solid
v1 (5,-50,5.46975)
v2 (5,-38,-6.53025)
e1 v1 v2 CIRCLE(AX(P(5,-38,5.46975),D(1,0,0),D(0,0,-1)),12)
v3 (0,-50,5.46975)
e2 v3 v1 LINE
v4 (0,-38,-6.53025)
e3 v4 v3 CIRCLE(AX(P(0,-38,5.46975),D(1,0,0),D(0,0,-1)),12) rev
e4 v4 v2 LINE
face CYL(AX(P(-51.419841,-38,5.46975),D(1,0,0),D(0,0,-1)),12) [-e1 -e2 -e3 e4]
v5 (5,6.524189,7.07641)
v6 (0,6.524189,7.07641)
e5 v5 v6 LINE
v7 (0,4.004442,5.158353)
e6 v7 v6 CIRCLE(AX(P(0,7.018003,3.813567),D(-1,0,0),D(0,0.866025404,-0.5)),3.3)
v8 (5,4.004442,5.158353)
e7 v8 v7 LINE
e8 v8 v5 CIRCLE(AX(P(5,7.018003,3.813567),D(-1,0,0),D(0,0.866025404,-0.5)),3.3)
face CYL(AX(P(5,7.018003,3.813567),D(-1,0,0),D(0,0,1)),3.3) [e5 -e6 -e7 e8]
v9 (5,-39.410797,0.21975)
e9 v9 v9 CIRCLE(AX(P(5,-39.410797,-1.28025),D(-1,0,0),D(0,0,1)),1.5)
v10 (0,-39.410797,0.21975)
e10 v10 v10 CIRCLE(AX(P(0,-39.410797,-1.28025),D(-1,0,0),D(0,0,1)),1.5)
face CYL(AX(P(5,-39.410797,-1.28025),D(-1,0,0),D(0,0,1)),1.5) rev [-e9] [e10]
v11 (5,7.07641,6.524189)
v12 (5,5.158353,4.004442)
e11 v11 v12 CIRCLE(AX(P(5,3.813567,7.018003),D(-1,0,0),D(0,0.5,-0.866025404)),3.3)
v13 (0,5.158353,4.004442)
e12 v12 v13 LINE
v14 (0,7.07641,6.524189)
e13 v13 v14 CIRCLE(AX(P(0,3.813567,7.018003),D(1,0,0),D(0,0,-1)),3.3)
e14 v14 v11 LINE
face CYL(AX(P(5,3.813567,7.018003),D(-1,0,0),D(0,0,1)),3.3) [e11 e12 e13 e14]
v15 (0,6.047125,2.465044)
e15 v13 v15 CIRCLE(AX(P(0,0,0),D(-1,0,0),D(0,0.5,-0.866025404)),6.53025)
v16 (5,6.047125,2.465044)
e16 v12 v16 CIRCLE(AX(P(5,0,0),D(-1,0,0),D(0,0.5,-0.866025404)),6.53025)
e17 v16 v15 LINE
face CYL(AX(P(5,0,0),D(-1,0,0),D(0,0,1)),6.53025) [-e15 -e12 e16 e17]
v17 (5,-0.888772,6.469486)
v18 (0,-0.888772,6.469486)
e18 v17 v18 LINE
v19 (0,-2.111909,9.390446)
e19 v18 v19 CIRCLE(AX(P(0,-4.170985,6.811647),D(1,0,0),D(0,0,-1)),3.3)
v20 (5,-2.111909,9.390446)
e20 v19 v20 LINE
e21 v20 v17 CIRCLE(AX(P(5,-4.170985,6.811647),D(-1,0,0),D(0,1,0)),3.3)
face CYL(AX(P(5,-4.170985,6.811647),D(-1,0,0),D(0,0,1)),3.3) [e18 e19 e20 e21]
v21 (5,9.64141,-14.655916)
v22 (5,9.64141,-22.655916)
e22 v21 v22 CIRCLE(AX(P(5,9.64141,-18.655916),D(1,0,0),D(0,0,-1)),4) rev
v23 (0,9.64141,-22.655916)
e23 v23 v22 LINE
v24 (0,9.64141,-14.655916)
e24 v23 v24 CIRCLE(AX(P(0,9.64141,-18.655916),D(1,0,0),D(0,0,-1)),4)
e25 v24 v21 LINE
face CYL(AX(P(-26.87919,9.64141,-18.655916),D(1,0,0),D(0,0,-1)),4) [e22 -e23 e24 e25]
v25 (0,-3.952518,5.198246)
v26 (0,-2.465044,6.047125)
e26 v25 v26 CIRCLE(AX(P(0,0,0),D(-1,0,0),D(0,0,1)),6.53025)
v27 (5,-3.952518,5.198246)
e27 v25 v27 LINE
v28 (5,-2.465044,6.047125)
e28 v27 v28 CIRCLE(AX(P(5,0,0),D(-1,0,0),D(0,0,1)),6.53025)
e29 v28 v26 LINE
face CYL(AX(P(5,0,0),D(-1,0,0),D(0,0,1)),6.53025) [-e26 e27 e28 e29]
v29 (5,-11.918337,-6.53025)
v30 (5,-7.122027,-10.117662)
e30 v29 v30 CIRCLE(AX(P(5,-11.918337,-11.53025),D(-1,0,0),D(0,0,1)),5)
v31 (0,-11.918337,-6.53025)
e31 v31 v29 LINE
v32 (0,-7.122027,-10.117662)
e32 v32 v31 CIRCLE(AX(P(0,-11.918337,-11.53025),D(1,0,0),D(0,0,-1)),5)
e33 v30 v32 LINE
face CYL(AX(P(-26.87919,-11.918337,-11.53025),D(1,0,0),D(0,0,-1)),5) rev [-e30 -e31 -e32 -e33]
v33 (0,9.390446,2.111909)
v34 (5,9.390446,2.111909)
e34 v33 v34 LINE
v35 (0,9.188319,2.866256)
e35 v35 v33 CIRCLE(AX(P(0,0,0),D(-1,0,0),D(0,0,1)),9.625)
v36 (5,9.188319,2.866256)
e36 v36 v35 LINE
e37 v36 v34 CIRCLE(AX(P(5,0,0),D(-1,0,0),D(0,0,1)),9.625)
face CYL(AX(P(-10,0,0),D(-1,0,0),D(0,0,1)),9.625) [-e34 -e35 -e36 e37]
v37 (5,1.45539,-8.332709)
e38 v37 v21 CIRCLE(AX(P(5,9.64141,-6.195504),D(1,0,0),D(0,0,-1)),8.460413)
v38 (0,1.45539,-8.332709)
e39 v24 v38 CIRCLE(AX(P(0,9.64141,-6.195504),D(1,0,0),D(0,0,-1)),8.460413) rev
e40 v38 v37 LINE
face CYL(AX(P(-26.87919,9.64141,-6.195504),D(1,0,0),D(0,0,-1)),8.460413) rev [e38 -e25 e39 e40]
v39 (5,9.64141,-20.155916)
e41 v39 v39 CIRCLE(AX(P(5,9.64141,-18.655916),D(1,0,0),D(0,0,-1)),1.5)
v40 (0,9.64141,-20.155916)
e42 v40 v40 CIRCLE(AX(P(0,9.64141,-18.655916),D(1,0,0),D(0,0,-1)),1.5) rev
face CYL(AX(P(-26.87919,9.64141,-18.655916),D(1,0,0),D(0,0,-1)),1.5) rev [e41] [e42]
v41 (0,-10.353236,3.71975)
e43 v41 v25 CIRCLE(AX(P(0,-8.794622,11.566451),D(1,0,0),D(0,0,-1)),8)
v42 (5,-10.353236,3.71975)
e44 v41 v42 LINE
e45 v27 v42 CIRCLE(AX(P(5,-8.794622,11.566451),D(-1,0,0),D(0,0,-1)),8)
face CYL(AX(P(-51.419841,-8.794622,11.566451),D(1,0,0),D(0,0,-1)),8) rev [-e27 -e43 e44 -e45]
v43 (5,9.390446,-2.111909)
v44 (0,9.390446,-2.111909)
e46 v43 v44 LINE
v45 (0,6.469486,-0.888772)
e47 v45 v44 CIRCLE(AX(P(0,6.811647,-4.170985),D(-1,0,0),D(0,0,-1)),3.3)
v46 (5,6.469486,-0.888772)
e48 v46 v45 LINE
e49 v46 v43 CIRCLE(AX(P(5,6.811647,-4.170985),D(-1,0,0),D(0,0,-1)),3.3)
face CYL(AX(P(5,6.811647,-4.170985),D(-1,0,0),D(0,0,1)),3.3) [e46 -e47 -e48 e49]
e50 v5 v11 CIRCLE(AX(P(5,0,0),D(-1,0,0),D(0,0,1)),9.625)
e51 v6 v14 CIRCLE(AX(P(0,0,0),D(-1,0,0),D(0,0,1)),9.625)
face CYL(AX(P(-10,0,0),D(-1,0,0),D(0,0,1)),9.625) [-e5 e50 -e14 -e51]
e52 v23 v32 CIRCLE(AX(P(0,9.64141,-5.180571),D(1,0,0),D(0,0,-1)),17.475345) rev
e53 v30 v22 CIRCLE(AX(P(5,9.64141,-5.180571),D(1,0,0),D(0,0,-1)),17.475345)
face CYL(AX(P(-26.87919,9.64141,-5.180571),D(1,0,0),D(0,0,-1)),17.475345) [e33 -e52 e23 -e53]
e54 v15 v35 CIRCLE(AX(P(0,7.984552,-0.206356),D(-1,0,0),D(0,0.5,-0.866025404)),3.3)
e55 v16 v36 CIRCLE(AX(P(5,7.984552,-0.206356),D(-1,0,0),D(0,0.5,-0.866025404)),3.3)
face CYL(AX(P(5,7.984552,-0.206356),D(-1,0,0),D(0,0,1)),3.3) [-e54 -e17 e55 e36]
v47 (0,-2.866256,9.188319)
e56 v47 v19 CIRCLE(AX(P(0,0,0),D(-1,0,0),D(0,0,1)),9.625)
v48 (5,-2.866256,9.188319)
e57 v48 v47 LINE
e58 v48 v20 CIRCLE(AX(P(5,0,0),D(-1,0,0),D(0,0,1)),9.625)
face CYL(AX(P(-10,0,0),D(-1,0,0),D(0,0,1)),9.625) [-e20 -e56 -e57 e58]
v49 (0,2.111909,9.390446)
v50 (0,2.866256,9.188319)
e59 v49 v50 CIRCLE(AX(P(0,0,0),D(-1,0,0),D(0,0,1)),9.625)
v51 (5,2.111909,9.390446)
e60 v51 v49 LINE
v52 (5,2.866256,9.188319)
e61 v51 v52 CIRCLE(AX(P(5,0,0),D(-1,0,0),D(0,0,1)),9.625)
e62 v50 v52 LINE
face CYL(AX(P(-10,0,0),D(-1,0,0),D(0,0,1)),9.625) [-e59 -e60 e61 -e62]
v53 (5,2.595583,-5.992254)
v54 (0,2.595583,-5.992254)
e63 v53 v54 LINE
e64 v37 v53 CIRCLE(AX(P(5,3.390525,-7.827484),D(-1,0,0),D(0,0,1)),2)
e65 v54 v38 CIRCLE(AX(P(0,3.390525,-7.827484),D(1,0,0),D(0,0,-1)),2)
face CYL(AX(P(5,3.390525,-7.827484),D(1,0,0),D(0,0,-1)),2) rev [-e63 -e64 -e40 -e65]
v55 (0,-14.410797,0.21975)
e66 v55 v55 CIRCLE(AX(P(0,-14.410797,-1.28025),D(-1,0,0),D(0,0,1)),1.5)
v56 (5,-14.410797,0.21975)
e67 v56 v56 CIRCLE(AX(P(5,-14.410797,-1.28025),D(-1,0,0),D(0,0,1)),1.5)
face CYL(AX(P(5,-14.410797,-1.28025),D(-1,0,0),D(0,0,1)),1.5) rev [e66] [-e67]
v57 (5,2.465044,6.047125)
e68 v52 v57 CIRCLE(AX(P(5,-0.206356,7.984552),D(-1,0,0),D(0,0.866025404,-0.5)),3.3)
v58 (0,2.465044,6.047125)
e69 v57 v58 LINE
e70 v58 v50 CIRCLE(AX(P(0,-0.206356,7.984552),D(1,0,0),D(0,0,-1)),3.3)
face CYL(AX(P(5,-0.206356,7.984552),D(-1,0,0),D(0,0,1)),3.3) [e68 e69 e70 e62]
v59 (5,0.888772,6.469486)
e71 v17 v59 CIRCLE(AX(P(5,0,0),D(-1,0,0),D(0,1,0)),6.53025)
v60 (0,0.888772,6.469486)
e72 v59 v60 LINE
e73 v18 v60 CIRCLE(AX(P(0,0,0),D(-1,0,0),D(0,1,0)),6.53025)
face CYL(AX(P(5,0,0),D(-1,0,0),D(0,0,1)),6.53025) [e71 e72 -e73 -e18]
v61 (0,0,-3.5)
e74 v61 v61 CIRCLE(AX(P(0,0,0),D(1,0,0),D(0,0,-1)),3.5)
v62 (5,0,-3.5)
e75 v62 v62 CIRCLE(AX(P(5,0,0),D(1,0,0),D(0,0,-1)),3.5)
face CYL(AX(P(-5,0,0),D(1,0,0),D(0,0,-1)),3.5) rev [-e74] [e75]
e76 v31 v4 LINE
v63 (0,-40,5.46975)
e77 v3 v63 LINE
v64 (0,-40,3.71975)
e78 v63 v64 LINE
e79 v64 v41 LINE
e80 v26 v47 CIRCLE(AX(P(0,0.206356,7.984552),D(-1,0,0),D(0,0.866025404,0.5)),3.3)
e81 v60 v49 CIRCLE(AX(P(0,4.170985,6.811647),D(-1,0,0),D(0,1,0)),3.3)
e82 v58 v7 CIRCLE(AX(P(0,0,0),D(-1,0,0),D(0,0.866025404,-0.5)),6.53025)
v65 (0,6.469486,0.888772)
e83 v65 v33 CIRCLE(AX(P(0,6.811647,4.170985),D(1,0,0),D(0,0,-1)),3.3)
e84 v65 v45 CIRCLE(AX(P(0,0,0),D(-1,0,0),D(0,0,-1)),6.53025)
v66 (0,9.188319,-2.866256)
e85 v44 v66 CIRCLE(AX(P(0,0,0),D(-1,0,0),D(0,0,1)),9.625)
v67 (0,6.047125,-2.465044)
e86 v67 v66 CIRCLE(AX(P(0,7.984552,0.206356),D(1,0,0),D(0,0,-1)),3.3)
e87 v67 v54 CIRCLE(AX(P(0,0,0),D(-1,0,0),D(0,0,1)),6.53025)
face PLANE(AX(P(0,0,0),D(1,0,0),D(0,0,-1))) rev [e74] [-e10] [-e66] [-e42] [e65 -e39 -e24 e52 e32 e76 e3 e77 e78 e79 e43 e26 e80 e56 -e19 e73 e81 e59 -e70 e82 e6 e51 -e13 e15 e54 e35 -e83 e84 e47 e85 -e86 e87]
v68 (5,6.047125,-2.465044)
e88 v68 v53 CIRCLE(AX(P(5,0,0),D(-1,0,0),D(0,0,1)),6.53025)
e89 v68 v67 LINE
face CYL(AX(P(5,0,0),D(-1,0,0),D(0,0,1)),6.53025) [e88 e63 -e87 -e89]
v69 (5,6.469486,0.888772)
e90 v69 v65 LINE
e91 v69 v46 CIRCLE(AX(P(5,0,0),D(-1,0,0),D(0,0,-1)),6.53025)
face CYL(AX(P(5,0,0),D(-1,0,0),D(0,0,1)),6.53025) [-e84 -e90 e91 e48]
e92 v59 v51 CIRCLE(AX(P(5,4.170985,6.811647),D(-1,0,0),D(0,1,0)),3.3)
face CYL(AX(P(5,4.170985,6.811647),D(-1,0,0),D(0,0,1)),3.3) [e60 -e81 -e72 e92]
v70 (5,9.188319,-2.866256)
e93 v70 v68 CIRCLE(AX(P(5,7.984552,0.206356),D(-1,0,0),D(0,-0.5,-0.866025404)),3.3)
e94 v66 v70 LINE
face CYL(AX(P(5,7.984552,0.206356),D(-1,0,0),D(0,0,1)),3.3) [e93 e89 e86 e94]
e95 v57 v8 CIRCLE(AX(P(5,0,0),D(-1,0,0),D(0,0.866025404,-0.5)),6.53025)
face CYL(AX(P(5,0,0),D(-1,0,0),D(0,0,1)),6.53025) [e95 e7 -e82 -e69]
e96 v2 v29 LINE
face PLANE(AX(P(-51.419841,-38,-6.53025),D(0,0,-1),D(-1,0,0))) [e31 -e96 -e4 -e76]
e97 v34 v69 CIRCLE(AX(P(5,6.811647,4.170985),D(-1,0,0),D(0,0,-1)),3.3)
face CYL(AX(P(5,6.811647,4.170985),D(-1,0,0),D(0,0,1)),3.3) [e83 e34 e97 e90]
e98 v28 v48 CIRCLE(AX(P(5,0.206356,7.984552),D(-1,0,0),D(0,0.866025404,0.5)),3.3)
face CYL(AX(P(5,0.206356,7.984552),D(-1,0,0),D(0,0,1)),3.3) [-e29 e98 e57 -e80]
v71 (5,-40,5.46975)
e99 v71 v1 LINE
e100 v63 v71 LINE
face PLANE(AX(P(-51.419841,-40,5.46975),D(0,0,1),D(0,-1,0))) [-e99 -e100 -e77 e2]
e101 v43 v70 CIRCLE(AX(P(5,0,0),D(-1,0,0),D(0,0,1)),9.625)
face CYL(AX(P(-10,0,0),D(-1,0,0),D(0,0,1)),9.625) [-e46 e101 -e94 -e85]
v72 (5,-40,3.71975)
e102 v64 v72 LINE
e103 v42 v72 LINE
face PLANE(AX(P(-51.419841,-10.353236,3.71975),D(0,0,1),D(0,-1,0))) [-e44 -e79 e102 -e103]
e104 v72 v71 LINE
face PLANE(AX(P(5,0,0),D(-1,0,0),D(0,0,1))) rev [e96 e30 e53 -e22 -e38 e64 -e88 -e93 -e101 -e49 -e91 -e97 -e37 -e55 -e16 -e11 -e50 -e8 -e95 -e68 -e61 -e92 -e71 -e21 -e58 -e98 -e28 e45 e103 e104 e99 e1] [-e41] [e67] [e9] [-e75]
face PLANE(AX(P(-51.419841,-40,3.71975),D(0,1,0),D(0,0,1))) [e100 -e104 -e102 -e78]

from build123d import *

# Parameters (mm, degrees)
CUT_EXTRUDE2_START     = -5
CUT_EXTRUDE2_OUTLINE_R = 3
CUT_EXTRUDE2_DEPTH     = 5
BOSS_EXTRUDE1_START    = -5
BOSS_EXTRUDE1_DEPTH    = 5
BOSS_EXTRUDE2_START    = -5
SKETCH3_R              = 1.5
BOSS_EXTRUDE2_DEPTH    = 5
FILLET1_R              = 2
FILLET2_R              = 5
SKETCH4_R              = 3.5
CUT_EXTRUDE3_DEPTH     = 10
SKETCH5_R              = 1.5
CUT_EXTRUDE4_DEPTH     = 56.120690806


with BuildPart() as part:
    # Cut-Extrude2: read off the stored shape, not the designer's step
    # Cut-Extrude2 outline → Cut-Extrude2 (new body)
    with BuildSketch(Plane(origin=(5, 0, 0), x_dir=(0, 0, -1), z_dir=(1, 0, 0)).offset(CUT_EXTRUDE2_START)):
        with BuildLine():
            ThreePointArc((-6.52418924, 7.07641009), (-6.805902769, 6.805902769), (-7.07641009, 6.52418924))
            ThreePointArc((-7.07641009, 6.52418924), (-6.439370402, 5.019214625), (-5.158353358, 4.004441996))
            ThreePointArc((-5.158353358, 4.004441996), (-5.655362393, 3.265125), (-6.047125175, 2.465044051))
            ThreePointArc((-6.047125175, 2.465044051), (-7.566452573, 3.06705104), (-9.188318666, 2.866256285))
            ThreePointArc((-9.188318666, 2.866256285), (-9.297036078, 2.491133309), (-9.390445525, 2.111908577))
            ThreePointArc((-9.390445525, 2.111908577), (-8.086265665, 1.127082171), (-6.469486047, 0.888771818))
            ThreePointArc((-6.469486047, 0.888771818), (-6.53025, 0), (-6.469486047, -0.888771818))
            ThreePointArc((-6.469486047, -0.888771818), (-8.086265665, -1.127082171), (-9.390445525, -2.111908577))
            ThreePointArc((-9.390445525, -2.111908577), (-9.297036078, -2.491133309), (-9.188318666, -2.866256285))
            ThreePointArc((-9.188318666, -2.866256285), (-7.566452573, -3.06705104), (-6.047125175, -2.465044051))
            ThreePointArc((-6.047125175, -2.465044051), (4.617584058, -4.617584058), (2.465044051, 6.047125175))
            ThreePointArc((2.465044051, 6.047125175), (3.06705104, 7.566452573), (2.866256285, 9.188318666))
            ThreePointArc((2.866256285, 9.188318666), (2.491133309, 9.297036078), (2.111908577, 9.390445525))
            ThreePointArc((2.111908577, 9.390445525), (1.127082171, 8.086265665), (0.888771818, 6.469486047))
            ThreePointArc((0.888771818, 6.469486047), (0, 6.53025), (-0.888771818, 6.469486047))
            ThreePointArc((-0.888771818, 6.469486047), (-1.127082171, 8.086265665), (-2.111908577, 9.390445525))
            ThreePointArc((-2.111908577, 9.390445525), (-2.491133309, 9.297036078), (-2.866256285, 9.188318666))
            ThreePointArc((-2.866256285, 9.188318666), (-3.06705104, 7.566452573), (-2.465044051, 6.047125175))
            ThreePointArc((-2.465044051, 6.047125175), (-3.265125, 5.655362393), (-4.004441996, 5.158353358))
            ThreePointArc((-4.004441996, 5.158353358), (-5.019214625, 6.439370402), (-6.52418924, 7.07641009))
        make_face()
        Circle(CUT_EXTRUDE2_OUTLINE_R, mode=Mode.SUBTRACT)
    extrude(amount=CUT_EXTRUDE2_DEPTH)

    # Sketch2 → Boss-Extrude1 (add)
    with BuildSketch(Plane(origin=(5, 0, 0), x_dir=(0, 0, -1), z_dir=(1, 0, 0)).offset(BOSS_EXTRUDE1_START)):
        with BuildLine():
            Line((-3.71975, -10.353236172), (-3.71975, -40))
            Line((-3.71975, -40), (-5.46975, -40))
            Line((-5.46975, -40), (-5.46975, -50))
            ThreePointArc((-5.46975, -50), (3.015531374, -46.485281374), (6.53025, -38))
            Line((6.53025, -38), (6.53025, 0))
            ThreePointArc((6.53025, 0), (2.085463632, -6.188295929), (-5.198246307, -3.952518235))
            ThreePointArc((-5.198246307, -3.952518235), (-3.771697436, -6.994118204), (-3.71975, -10.353236172))
        make_face()
    extrude(amount=BOSS_EXTRUDE1_DEPTH)

    # Sketch3 → Boss-Extrude2 (add)
    with BuildSketch(Plane(origin=(5, 0, 0), x_dir=(0, 0, -1), z_dir=(1, 0, 0)).offset(BOSS_EXTRUDE2_START)):
        with BuildLine():
            Line((6.53025, 0), (6.53025, -7.78173689))
            ThreePointArc((6.53025, -7.78173689), (18.005815569, -2.228753726), (22.655916213, 9.64141018))
            ThreePointArc((22.655916213, 9.64141018), (18.655916213, 13.64141018), (14.655916213, 9.64141018))
            ThreePointArc((14.655916213, 9.64141018), (12.257472566, 3.739621168), (6.422011938, 1.184030293))
            ThreePointArc((6.422011938, 1.184030293), (6.503134187, 0.594483644), (6.53025, 0))
        make_face()
        with Locations((18.655916213, 9.64141018)):
            Circle(SKETCH3_R, mode=Mode.SUBTRACT)
    extrude(amount=BOSS_EXTRUDE2_DEPTH)

    # Fillet1
    fillet1_edges = [part.edges().sort_by_distance(p)[0] for p in [
        (2.5, 1.184030293, -6.422011938),
    ]]
    fillet(fillet1_edges, radius=FILLET1_R)

    # Fillet2
    fillet2_edges = [part.edges().sort_by_distance(p)[0] for p in [
        (2.5, -7.78173689, -6.53025),
    ]]
    fillet(fillet2_edges, radius=FILLET2_R)

    # Sketch4 → Cut-Extrude3 (cut)
    with BuildSketch(Plane(origin=(5, 0, 0), x_dir=(0, 0, -1), z_dir=(1, 0, 0))):
        Circle(SKETCH4_R)
    extrude(amount=-CUT_EXTRUDE3_DEPTH, mode=Mode.SUBTRACT)

    # Sketch5 → Cut-Extrude4 (cut, through all)
    with BuildSketch(Plane.ZY):
        with Locations((-1.28025, -14.410797367)):
            Circle(SKETCH5_R)
        with Locations((-1.28025, -39.410797367)):
            Circle(SKETCH5_R)
    extrude(amount=-CUT_EXTRUDE4_DEPTH, mode=Mode.SUBTRACT)


solid = part.part
